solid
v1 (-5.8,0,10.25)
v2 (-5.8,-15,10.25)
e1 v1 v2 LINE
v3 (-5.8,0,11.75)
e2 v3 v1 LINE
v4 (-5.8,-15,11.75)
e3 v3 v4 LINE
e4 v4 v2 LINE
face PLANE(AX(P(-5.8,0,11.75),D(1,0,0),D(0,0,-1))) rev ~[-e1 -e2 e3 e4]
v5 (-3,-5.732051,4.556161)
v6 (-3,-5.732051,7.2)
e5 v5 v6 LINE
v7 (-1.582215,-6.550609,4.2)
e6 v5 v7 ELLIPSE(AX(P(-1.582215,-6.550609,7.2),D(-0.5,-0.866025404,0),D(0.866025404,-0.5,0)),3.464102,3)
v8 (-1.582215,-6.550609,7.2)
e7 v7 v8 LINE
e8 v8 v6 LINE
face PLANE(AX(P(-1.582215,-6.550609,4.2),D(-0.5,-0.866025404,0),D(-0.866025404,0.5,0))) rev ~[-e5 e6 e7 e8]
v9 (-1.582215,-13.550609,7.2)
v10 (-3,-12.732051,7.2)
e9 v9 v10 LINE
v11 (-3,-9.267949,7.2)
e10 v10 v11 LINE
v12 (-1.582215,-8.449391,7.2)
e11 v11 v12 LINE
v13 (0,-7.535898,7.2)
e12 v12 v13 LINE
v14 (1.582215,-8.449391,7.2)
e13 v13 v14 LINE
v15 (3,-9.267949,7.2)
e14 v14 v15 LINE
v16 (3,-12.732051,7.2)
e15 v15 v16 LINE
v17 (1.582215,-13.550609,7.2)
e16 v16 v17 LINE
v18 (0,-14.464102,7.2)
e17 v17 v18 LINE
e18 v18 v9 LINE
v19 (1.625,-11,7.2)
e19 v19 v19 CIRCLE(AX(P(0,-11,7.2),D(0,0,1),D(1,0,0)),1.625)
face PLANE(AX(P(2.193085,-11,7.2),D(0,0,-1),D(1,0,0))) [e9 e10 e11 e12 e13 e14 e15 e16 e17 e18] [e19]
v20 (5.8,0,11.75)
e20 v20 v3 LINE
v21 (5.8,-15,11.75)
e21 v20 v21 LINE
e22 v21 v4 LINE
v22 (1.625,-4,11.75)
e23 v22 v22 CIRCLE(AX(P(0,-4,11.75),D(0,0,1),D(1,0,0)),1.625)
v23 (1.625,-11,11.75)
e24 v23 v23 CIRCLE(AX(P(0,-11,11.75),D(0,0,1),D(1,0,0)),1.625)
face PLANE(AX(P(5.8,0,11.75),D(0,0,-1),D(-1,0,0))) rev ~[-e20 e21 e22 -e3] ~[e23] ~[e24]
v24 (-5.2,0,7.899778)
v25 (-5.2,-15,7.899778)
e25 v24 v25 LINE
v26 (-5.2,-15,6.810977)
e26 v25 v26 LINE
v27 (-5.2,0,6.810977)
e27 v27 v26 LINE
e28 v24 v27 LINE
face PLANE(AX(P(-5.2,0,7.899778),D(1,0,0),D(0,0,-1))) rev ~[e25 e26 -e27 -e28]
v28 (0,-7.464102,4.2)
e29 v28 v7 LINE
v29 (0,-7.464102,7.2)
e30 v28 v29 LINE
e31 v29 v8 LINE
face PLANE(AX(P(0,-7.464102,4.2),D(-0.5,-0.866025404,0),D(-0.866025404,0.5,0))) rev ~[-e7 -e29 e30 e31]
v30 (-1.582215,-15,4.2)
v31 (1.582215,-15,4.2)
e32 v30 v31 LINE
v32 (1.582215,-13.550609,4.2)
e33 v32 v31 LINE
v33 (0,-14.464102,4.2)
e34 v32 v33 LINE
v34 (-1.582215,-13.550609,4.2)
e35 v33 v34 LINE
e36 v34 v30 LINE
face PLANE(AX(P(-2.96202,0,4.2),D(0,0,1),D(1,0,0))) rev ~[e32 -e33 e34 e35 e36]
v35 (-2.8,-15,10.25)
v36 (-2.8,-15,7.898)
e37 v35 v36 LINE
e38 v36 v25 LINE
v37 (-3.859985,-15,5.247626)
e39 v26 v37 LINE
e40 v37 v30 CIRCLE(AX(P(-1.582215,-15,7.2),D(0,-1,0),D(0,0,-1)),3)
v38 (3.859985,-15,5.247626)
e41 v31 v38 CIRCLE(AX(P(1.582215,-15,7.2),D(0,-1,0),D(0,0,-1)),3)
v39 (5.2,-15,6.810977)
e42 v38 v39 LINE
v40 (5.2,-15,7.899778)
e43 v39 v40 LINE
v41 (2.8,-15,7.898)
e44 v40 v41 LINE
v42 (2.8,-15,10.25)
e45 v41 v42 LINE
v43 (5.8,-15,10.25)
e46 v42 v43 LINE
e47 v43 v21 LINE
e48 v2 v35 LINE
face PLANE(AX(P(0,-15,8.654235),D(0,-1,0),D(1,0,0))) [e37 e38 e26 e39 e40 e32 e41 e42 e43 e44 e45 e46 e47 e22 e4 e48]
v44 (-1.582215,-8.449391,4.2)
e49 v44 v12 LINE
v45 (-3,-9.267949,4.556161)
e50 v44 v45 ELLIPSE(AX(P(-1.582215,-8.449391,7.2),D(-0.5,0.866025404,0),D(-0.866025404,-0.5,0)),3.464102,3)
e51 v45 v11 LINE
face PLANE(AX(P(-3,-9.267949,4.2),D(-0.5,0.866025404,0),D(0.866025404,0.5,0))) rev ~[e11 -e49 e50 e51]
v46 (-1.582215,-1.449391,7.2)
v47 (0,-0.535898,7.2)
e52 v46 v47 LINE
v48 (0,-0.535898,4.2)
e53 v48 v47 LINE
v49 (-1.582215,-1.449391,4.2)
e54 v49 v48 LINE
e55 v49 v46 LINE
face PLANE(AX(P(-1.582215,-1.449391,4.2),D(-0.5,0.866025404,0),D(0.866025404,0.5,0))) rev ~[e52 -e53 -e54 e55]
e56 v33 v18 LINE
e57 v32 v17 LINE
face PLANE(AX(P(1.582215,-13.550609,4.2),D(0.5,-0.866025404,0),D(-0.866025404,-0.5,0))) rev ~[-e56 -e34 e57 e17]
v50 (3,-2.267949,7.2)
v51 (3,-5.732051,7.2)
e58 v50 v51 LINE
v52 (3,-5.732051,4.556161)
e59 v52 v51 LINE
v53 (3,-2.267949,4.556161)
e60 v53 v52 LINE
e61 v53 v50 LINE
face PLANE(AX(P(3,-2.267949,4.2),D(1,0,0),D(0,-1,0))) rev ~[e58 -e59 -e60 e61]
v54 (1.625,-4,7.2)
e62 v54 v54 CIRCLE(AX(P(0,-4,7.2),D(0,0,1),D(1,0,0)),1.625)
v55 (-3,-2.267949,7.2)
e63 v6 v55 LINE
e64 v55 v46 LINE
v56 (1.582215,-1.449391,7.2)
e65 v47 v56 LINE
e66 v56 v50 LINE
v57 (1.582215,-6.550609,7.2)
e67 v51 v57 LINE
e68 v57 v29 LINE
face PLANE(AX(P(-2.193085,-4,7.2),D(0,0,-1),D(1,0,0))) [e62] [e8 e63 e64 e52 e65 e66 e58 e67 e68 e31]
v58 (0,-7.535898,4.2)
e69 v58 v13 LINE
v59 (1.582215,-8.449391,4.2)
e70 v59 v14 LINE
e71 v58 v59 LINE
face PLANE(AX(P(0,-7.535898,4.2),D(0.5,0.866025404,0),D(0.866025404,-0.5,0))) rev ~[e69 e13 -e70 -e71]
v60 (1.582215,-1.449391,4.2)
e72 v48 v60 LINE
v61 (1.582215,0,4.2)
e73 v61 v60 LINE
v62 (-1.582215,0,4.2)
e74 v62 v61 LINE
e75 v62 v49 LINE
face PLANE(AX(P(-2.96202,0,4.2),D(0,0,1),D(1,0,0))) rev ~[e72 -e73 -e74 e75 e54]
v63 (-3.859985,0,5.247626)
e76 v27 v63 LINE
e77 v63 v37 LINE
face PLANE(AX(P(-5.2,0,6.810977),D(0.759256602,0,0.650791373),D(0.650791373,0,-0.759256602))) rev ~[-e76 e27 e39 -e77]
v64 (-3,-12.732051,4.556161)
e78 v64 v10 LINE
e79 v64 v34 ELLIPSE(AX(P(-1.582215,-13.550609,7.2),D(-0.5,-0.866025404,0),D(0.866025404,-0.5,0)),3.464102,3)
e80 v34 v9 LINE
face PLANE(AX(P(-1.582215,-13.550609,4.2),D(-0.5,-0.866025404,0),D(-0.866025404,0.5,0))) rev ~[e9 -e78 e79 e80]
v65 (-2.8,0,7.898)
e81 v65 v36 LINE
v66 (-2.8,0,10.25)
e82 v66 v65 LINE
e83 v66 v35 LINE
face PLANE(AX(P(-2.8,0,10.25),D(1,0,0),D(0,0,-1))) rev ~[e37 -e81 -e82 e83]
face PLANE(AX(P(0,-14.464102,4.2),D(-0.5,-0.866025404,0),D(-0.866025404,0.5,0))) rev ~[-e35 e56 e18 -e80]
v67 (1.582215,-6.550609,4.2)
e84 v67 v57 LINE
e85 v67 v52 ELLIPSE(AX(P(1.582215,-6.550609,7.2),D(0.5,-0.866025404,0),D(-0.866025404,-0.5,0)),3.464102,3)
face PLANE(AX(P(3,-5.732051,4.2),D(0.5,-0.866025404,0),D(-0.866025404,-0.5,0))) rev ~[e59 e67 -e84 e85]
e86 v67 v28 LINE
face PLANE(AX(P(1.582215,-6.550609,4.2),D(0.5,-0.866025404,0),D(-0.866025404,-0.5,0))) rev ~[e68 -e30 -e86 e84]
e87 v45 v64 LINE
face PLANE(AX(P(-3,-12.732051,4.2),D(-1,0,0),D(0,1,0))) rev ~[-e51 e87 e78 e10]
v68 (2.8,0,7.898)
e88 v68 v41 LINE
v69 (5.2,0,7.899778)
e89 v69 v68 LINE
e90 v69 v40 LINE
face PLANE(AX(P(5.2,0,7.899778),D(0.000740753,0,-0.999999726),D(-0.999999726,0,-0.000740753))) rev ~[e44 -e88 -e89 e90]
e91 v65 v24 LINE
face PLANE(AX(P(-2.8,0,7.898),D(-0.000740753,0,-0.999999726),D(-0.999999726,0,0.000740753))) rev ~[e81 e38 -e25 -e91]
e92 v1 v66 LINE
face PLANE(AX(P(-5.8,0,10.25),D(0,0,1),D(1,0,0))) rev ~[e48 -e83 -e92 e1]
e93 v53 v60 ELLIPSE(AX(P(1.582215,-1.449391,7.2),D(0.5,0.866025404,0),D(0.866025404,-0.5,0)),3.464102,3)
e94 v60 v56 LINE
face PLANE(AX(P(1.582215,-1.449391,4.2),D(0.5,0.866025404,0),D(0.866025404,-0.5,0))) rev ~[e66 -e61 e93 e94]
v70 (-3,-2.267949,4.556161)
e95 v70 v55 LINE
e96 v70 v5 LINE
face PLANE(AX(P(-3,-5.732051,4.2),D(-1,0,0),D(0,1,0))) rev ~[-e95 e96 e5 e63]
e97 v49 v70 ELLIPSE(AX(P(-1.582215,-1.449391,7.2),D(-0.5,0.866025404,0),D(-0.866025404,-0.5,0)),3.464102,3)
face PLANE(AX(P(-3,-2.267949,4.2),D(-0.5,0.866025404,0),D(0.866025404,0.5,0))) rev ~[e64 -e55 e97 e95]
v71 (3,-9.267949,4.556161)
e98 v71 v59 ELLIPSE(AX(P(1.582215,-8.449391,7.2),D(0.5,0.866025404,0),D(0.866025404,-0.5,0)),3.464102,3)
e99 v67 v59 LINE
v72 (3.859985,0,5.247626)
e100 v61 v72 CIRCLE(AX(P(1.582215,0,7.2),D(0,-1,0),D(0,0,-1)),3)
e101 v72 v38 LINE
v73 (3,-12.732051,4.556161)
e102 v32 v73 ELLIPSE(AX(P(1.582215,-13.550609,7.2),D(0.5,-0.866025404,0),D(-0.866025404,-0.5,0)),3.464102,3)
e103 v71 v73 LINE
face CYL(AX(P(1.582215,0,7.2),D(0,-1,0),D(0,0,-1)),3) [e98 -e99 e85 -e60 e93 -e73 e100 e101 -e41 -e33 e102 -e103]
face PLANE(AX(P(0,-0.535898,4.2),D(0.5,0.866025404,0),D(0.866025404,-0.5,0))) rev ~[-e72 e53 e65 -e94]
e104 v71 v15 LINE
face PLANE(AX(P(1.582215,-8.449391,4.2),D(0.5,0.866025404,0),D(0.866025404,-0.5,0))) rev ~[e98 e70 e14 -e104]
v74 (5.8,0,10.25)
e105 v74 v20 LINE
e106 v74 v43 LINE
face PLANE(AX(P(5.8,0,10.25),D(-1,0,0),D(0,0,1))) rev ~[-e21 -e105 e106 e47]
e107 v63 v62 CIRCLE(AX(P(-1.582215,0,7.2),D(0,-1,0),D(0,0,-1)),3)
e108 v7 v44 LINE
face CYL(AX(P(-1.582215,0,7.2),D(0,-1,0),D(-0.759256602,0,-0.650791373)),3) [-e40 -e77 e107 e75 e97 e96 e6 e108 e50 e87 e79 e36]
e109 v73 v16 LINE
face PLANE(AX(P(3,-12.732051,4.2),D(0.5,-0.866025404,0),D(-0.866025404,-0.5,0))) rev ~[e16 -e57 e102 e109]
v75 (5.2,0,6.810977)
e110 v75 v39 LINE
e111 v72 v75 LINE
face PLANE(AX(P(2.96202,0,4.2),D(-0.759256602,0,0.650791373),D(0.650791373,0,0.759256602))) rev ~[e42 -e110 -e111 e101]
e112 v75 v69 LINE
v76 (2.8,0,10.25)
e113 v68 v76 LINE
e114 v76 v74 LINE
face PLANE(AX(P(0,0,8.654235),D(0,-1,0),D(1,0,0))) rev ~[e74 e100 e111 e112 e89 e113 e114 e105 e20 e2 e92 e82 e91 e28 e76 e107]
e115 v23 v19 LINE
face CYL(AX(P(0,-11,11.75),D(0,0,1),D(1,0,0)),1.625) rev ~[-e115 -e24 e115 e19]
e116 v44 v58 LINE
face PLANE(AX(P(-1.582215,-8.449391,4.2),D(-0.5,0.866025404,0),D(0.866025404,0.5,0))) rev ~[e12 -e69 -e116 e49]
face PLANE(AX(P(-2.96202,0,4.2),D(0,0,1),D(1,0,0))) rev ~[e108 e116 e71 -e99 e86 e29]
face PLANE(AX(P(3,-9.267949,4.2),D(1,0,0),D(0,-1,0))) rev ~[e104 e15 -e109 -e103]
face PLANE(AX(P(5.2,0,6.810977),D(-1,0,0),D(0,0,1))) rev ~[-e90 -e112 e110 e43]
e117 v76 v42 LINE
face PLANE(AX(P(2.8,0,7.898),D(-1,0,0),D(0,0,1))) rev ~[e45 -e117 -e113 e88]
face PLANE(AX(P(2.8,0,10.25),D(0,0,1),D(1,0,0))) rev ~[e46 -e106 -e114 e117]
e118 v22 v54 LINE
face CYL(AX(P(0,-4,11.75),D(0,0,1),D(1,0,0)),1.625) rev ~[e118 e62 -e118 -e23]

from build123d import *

# Parameters (mm, degrees)
F1_DEPTH = 15
F2_R     = 3
F3_R     = 1.625
F4_DEPTH = 6
F6_DEPTH = 3


# Not quite as in the source:
# - a feature names something its author has since deleted; it is built from what else it names


with BuildPart() as f1:
    # F0 (on Front) → F1 (new body)
    with BuildSketch(Plane.XZ):
        Polygon((2.8, 7.8979998849), (2.8, 10), (2.8, 10.25), (5.8, 10.25), (5.8, 11.75), (0, 11.75), (-5.8, 11.75), (-5.8, 10.25), (-2.8, 10.25), (-2.8, 10), (-2.8, 7.8979998849), (-5.2, 7.8997776918), (-5.2, 6.8109772229), (-2.9620195233, 4.2), (0, 4.2), (2.9620195233, 4.2), (5.2, 6.8109772229), (5.2, 7.8997776918), align=None)
    extrude(amount=F1_DEPTH)

    # F2
    f2_edges = [f1.edges().sort_by_distance(p)[0] for p in [
        (-2.96202, -7.5, 4.2),
        (2.96202, -7.5, 4.2),
    ]]
    fillet(f2_edges, radius=F2_R)

    # F3 (on face) → F4 (cut)
    with BuildSketch(Plane.XY.offset(11.75)):
        with Locations((0, -4)):
            Circle(F3_R)
        with Locations((0, -11)):
            Circle(F3_R)
    extrude(amount=-F4_DEPTH, mode=Mode.SUBTRACT)

    # F5 (on face) → F6 (cut)
    with BuildSketch(Plane(origin=(0, 0, 4.2), x_dir=(1, 0, 0), z_dir=(0, 0, -1))):
        Polygon((3, 12.7320508076), (1.5822147558, 13.5506094999), (1.5822147558, 8.4493905001), (3, 9.2679491924), align=None)
        Polygon((-1.5822147558, 8.4493905001), (-1.5822147558, 13.5506094999), (-3, 12.7320508076), (-3, 9.2679491924), align=None)
        Polygon((-1.5822147558, 1.4493905001), (-1.5822147558, 6.5506094999), (-3, 5.7320508076), (-3, 2.2679491924), align=None)
        Polygon((3, 5.7320508076), (1.5822147558, 6.5506094999), (1.5822147558, 1.4493905001), (3, 2.2679491924), align=None)
        Polygon((1.5822147558, 13.5506094999), (0, 14.4641016151), (-1.5822147558, 13.5506094999), (-1.5822147558, 8.4493905001), (0, 7.5358983849), (1.5822147558, 8.4493905001), align=None)
        Polygon((1.5822147558, 1.4493905001), (1.5822147558, 6.5506094999), (0, 7.4641016151), (-1.5822147558, 6.5506094999), (-1.5822147558, 1.4493905001), (0, 0.5358983849), align=None)
    extrude(amount=-F6_DEPTH, mode=Mode.SUBTRACT)


solid = f1.part
